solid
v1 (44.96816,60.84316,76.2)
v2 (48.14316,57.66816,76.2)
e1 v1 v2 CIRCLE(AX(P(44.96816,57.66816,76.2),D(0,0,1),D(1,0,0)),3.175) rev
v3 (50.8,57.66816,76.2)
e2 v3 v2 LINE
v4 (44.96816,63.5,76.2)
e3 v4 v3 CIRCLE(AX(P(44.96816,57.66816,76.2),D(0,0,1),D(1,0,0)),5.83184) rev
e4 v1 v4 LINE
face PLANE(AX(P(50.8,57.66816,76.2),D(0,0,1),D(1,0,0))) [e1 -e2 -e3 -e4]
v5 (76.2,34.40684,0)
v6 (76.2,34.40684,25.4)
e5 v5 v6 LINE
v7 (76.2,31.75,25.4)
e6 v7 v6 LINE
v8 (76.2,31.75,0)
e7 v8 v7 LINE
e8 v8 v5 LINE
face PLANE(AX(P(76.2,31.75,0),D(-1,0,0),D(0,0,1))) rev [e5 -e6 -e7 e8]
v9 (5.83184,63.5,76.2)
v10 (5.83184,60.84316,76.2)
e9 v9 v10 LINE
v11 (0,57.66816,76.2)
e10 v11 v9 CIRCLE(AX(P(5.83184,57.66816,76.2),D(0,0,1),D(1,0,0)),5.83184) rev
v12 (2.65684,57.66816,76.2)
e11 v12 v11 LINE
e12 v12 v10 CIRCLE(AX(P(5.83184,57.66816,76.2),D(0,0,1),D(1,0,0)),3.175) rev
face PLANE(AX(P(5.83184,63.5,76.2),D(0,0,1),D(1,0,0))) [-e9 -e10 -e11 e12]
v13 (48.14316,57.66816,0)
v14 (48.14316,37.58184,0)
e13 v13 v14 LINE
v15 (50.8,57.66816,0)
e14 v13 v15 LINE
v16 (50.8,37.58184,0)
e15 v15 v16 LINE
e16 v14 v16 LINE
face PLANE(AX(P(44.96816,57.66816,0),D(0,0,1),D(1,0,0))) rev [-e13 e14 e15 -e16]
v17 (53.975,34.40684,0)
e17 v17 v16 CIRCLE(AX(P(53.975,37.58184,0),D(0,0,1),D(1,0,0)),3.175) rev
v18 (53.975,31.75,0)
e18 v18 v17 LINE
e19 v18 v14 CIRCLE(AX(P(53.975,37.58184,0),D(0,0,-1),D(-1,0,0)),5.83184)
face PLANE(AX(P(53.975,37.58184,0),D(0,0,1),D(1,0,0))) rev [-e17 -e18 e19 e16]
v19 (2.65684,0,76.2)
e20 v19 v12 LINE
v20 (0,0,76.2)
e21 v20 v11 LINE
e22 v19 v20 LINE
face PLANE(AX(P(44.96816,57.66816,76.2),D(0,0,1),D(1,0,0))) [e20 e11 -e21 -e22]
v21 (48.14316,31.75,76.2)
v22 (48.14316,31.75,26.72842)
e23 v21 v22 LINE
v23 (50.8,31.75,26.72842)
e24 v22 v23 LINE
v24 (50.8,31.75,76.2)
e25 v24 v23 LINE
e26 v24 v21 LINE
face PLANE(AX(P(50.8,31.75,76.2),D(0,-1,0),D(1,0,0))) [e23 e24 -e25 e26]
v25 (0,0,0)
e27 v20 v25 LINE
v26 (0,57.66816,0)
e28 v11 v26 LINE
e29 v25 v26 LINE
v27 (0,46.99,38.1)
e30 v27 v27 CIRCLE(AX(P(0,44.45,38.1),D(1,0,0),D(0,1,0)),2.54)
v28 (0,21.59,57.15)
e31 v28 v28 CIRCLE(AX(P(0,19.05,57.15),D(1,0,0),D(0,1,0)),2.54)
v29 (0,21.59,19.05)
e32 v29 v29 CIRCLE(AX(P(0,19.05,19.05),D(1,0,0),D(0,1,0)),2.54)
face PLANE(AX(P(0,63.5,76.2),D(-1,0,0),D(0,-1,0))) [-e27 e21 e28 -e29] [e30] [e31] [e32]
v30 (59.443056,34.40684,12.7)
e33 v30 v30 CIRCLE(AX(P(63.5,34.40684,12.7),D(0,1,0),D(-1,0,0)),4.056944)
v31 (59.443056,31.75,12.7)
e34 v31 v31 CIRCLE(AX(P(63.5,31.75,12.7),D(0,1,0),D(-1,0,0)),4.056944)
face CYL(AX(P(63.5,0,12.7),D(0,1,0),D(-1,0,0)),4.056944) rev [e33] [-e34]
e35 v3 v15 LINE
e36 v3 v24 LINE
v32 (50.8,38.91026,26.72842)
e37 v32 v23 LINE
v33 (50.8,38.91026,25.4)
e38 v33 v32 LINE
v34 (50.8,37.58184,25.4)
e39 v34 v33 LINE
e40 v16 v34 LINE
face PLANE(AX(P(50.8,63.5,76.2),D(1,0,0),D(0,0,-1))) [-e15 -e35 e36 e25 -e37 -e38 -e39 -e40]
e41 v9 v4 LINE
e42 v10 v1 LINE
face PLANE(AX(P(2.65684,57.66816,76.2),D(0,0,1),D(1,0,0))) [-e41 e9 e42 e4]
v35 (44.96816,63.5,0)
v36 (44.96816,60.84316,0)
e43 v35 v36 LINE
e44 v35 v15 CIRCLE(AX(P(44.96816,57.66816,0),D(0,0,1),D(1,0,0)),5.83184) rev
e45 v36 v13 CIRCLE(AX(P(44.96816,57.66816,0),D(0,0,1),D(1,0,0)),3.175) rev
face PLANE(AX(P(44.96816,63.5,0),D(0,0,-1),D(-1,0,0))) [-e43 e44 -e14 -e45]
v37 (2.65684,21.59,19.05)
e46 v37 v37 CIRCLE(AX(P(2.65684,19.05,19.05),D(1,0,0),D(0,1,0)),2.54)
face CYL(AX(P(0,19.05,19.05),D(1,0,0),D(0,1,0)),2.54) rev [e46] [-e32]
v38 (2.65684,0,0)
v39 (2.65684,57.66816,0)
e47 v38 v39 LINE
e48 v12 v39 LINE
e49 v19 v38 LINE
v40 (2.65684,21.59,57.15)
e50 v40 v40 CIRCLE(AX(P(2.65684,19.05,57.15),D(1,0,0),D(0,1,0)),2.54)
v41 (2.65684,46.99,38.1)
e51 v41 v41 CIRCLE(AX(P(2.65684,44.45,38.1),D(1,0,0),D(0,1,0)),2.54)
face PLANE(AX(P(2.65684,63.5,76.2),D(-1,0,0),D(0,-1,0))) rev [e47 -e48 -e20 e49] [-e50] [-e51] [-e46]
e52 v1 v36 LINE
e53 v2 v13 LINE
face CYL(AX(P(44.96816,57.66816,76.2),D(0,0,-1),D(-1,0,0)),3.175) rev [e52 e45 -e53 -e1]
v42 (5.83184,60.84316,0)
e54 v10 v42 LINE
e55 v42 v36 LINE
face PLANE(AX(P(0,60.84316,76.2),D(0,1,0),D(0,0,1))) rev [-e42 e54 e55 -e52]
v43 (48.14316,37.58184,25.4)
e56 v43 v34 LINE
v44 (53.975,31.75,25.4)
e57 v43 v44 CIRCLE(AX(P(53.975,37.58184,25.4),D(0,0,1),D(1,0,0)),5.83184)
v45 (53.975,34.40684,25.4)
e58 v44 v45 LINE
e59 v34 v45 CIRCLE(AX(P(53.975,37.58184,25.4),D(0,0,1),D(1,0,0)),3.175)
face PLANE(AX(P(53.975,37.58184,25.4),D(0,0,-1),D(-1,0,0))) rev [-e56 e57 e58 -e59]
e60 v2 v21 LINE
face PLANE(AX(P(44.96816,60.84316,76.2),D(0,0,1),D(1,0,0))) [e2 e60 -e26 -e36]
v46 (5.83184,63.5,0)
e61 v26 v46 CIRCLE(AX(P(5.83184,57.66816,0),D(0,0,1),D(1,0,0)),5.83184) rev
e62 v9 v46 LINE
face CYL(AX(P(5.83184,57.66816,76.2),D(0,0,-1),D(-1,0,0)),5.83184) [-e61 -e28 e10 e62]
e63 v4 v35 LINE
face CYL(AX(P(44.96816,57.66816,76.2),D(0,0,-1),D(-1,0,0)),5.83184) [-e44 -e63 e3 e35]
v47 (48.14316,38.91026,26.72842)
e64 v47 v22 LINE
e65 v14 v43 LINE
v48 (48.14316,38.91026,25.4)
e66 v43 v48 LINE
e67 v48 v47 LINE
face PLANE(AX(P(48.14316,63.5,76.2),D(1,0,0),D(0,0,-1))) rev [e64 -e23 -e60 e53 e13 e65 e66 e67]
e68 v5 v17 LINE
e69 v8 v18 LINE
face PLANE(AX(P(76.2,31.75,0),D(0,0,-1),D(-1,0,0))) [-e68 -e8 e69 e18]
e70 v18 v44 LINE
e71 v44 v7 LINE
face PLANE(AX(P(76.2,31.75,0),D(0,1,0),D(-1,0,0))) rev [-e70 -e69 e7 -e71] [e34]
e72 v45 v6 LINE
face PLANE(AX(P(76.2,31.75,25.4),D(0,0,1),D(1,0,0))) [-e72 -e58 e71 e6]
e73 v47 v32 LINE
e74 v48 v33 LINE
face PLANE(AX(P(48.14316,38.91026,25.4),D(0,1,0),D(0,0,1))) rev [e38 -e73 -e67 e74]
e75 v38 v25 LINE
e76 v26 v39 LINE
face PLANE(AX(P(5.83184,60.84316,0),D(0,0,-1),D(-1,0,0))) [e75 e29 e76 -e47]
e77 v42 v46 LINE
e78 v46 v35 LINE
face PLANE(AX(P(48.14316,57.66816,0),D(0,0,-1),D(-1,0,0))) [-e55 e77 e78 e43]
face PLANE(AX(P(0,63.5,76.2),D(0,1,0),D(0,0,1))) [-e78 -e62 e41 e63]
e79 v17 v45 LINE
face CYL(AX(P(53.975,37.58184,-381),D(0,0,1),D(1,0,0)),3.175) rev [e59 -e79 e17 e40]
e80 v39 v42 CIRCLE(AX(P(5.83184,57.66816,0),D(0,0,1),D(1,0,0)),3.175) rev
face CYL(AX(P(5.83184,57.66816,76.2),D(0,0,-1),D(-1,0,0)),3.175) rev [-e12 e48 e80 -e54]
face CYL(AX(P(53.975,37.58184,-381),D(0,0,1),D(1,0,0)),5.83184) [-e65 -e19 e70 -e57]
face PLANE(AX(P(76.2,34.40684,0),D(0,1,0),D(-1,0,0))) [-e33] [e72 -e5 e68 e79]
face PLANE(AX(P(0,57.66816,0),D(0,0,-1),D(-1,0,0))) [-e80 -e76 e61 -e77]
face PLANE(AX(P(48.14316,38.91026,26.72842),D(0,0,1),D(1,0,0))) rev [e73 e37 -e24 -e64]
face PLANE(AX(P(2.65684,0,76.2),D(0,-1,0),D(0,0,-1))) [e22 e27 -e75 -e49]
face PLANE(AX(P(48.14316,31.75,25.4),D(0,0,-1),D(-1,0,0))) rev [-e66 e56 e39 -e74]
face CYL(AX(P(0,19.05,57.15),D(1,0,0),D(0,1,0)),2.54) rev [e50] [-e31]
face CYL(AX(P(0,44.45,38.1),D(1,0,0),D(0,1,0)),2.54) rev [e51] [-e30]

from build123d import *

# Parameters (mm, degrees)
BASE_FLANGE1_DEPTH    = 76.2
SKETCH5_R             = 2.54
CUT_EXTRUDE1_DEPTH    = 111.256309818
MITER_FLANGE1_DEPTH   = 26.72842
MITER_START           = 25.4
MITER_FLANGE1_2_DEPTH = 1.32842
MITER_FLANGE1_3_DEPTH = 25.4
SKETCH7_R             = 4.056943783
CUT_EXTRUDE2_DEPTH    = 114.122546996


# Read off the part's stored shape, not the designer's step: Miter Flange1
# Sheet-metal steps are written as plain solids
with BuildPart() as part:
    # Sketch3 → Base-Flange1 (new body)
    with BuildSketch(Plane.XY):
        with BuildLine():
            Line((50.8, 31.75), (50.8, 57.66816))
            ThreePointArc((50.8, 57.66816), (49.091893611, 61.791893611), (44.96816, 63.5))
            Line((44.96816, 63.5), (5.83184, 63.5))
            ThreePointArc((5.83184, 63.5), (1.708106389, 61.791893611), (0, 57.66816))
            Line((0, 57.66816), (0, 0))
            Line((0, 0), (2.65684, 0))
            Line((2.65684, 0), (2.65684, 57.66816))
            ThreePointArc((2.65684, 57.66816), (3.58677597, 59.91322403), (5.83184, 60.84316))
            Line((5.83184, 60.84316), (44.96816, 60.84316))
            ThreePointArc((44.96816, 60.84316), (47.21322403, 59.91322403), (48.14316, 57.66816))
            Line((48.14316, 57.66816), (48.14316, 31.75))
            Line((48.14316, 31.75), (50.8, 31.75))
        make_face()
    extrude(amount=BASE_FLANGE1_DEPTH)

    # Sketch5 → Cut-Extrude1 (cut, through all)
    with BuildSketch(Plane(origin=(2.65684, 0, 0), x_dir=(0, 0, -1), z_dir=(1, 0, 0))):
        with Locations(Location((-57.15, 19.05, 0), (0, 0, 90))):
            Circle(SKETCH5_R)
        with Locations(Location((-38.1, 44.45, 0), (0, 0, 90))):
            Circle(SKETCH5_R)
        with Locations(Location((-19.05, 19.05, 0), (0, 0, 90))):
            Circle(SKETCH5_R)
    extrude(amount=-CUT_EXTRUDE1_DEPTH, mode=Mode.SUBTRACT)

    # Miter Flange1 outline → Miter Flange1 (cut)
    with BuildSketch(Plane.XY):
        with BuildLine():
            Line((50.8, 31.75), (50.8, 32.690037389))
            ThreePointArc((50.8, 32.690037389), (48.850234162, 34.798472814), (48.14316, 37.58184))
            Line((48.14316, 37.58184), (48.14316, 31.75))
            Line((48.14316, 31.75), (50.8, 31.75))
        make_face()
    extrude(amount=MITER_FLANGE1_DEPTH, mode=Mode.SUBTRACT)

    # Miter Flange1 2 outline → Miter Flange1 2 (cut)
    with BuildSketch(Plane.XY.offset(MITER_START)):
        with BuildLine():
            ThreePointArc((48.14316, 37.58184), (48.850234162, 34.798472814), (50.8, 32.690037389))
            Line((50.8, 32.690037389), (50.8, 38.91026))
            Line((50.8, 38.91026), (48.14316, 38.91026))
            Line((48.14316, 38.91026), (48.14316, 37.58184))
        make_face()
    extrude(amount=MITER_FLANGE1_2_DEPTH, mode=Mode.SUBTRACT)

    # Miter Flange1 3 outline → Miter Flange1 3 (add)
    with BuildSketch(Plane.XY):
        with BuildLine():
            Line((53.975, 31.75), (76.2, 31.75))
            Line((76.2, 31.75), (76.2, 34.40684))
            Line((76.2, 34.40684), (53.975, 34.40684))
            ThreePointArc((53.975, 34.40684), (51.72993597, 35.33677597), (50.8, 37.58184))
            Line((50.8, 37.58184), (50.8, 32.690037389))
            ThreePointArc((50.8, 32.690037389), (52.319381136, 31.989945512), (53.975, 31.75))
        make_face()
    extrude(amount=MITER_FLANGE1_3_DEPTH)

    # Sketch7 → Cut-Extrude2 (cut, through all)
    with BuildSketch(Plane(origin=(0, 34.40684, 0), x_dir=(-1, 0, 0), z_dir=(0, 1, 0))):
        with Locations((-63.5, 12.7)):
            Circle(SKETCH7_R)
    extrude(amount=-CUT_EXTRUDE2_DEPTH, mode=Mode.SUBTRACT)


solid = part.part
